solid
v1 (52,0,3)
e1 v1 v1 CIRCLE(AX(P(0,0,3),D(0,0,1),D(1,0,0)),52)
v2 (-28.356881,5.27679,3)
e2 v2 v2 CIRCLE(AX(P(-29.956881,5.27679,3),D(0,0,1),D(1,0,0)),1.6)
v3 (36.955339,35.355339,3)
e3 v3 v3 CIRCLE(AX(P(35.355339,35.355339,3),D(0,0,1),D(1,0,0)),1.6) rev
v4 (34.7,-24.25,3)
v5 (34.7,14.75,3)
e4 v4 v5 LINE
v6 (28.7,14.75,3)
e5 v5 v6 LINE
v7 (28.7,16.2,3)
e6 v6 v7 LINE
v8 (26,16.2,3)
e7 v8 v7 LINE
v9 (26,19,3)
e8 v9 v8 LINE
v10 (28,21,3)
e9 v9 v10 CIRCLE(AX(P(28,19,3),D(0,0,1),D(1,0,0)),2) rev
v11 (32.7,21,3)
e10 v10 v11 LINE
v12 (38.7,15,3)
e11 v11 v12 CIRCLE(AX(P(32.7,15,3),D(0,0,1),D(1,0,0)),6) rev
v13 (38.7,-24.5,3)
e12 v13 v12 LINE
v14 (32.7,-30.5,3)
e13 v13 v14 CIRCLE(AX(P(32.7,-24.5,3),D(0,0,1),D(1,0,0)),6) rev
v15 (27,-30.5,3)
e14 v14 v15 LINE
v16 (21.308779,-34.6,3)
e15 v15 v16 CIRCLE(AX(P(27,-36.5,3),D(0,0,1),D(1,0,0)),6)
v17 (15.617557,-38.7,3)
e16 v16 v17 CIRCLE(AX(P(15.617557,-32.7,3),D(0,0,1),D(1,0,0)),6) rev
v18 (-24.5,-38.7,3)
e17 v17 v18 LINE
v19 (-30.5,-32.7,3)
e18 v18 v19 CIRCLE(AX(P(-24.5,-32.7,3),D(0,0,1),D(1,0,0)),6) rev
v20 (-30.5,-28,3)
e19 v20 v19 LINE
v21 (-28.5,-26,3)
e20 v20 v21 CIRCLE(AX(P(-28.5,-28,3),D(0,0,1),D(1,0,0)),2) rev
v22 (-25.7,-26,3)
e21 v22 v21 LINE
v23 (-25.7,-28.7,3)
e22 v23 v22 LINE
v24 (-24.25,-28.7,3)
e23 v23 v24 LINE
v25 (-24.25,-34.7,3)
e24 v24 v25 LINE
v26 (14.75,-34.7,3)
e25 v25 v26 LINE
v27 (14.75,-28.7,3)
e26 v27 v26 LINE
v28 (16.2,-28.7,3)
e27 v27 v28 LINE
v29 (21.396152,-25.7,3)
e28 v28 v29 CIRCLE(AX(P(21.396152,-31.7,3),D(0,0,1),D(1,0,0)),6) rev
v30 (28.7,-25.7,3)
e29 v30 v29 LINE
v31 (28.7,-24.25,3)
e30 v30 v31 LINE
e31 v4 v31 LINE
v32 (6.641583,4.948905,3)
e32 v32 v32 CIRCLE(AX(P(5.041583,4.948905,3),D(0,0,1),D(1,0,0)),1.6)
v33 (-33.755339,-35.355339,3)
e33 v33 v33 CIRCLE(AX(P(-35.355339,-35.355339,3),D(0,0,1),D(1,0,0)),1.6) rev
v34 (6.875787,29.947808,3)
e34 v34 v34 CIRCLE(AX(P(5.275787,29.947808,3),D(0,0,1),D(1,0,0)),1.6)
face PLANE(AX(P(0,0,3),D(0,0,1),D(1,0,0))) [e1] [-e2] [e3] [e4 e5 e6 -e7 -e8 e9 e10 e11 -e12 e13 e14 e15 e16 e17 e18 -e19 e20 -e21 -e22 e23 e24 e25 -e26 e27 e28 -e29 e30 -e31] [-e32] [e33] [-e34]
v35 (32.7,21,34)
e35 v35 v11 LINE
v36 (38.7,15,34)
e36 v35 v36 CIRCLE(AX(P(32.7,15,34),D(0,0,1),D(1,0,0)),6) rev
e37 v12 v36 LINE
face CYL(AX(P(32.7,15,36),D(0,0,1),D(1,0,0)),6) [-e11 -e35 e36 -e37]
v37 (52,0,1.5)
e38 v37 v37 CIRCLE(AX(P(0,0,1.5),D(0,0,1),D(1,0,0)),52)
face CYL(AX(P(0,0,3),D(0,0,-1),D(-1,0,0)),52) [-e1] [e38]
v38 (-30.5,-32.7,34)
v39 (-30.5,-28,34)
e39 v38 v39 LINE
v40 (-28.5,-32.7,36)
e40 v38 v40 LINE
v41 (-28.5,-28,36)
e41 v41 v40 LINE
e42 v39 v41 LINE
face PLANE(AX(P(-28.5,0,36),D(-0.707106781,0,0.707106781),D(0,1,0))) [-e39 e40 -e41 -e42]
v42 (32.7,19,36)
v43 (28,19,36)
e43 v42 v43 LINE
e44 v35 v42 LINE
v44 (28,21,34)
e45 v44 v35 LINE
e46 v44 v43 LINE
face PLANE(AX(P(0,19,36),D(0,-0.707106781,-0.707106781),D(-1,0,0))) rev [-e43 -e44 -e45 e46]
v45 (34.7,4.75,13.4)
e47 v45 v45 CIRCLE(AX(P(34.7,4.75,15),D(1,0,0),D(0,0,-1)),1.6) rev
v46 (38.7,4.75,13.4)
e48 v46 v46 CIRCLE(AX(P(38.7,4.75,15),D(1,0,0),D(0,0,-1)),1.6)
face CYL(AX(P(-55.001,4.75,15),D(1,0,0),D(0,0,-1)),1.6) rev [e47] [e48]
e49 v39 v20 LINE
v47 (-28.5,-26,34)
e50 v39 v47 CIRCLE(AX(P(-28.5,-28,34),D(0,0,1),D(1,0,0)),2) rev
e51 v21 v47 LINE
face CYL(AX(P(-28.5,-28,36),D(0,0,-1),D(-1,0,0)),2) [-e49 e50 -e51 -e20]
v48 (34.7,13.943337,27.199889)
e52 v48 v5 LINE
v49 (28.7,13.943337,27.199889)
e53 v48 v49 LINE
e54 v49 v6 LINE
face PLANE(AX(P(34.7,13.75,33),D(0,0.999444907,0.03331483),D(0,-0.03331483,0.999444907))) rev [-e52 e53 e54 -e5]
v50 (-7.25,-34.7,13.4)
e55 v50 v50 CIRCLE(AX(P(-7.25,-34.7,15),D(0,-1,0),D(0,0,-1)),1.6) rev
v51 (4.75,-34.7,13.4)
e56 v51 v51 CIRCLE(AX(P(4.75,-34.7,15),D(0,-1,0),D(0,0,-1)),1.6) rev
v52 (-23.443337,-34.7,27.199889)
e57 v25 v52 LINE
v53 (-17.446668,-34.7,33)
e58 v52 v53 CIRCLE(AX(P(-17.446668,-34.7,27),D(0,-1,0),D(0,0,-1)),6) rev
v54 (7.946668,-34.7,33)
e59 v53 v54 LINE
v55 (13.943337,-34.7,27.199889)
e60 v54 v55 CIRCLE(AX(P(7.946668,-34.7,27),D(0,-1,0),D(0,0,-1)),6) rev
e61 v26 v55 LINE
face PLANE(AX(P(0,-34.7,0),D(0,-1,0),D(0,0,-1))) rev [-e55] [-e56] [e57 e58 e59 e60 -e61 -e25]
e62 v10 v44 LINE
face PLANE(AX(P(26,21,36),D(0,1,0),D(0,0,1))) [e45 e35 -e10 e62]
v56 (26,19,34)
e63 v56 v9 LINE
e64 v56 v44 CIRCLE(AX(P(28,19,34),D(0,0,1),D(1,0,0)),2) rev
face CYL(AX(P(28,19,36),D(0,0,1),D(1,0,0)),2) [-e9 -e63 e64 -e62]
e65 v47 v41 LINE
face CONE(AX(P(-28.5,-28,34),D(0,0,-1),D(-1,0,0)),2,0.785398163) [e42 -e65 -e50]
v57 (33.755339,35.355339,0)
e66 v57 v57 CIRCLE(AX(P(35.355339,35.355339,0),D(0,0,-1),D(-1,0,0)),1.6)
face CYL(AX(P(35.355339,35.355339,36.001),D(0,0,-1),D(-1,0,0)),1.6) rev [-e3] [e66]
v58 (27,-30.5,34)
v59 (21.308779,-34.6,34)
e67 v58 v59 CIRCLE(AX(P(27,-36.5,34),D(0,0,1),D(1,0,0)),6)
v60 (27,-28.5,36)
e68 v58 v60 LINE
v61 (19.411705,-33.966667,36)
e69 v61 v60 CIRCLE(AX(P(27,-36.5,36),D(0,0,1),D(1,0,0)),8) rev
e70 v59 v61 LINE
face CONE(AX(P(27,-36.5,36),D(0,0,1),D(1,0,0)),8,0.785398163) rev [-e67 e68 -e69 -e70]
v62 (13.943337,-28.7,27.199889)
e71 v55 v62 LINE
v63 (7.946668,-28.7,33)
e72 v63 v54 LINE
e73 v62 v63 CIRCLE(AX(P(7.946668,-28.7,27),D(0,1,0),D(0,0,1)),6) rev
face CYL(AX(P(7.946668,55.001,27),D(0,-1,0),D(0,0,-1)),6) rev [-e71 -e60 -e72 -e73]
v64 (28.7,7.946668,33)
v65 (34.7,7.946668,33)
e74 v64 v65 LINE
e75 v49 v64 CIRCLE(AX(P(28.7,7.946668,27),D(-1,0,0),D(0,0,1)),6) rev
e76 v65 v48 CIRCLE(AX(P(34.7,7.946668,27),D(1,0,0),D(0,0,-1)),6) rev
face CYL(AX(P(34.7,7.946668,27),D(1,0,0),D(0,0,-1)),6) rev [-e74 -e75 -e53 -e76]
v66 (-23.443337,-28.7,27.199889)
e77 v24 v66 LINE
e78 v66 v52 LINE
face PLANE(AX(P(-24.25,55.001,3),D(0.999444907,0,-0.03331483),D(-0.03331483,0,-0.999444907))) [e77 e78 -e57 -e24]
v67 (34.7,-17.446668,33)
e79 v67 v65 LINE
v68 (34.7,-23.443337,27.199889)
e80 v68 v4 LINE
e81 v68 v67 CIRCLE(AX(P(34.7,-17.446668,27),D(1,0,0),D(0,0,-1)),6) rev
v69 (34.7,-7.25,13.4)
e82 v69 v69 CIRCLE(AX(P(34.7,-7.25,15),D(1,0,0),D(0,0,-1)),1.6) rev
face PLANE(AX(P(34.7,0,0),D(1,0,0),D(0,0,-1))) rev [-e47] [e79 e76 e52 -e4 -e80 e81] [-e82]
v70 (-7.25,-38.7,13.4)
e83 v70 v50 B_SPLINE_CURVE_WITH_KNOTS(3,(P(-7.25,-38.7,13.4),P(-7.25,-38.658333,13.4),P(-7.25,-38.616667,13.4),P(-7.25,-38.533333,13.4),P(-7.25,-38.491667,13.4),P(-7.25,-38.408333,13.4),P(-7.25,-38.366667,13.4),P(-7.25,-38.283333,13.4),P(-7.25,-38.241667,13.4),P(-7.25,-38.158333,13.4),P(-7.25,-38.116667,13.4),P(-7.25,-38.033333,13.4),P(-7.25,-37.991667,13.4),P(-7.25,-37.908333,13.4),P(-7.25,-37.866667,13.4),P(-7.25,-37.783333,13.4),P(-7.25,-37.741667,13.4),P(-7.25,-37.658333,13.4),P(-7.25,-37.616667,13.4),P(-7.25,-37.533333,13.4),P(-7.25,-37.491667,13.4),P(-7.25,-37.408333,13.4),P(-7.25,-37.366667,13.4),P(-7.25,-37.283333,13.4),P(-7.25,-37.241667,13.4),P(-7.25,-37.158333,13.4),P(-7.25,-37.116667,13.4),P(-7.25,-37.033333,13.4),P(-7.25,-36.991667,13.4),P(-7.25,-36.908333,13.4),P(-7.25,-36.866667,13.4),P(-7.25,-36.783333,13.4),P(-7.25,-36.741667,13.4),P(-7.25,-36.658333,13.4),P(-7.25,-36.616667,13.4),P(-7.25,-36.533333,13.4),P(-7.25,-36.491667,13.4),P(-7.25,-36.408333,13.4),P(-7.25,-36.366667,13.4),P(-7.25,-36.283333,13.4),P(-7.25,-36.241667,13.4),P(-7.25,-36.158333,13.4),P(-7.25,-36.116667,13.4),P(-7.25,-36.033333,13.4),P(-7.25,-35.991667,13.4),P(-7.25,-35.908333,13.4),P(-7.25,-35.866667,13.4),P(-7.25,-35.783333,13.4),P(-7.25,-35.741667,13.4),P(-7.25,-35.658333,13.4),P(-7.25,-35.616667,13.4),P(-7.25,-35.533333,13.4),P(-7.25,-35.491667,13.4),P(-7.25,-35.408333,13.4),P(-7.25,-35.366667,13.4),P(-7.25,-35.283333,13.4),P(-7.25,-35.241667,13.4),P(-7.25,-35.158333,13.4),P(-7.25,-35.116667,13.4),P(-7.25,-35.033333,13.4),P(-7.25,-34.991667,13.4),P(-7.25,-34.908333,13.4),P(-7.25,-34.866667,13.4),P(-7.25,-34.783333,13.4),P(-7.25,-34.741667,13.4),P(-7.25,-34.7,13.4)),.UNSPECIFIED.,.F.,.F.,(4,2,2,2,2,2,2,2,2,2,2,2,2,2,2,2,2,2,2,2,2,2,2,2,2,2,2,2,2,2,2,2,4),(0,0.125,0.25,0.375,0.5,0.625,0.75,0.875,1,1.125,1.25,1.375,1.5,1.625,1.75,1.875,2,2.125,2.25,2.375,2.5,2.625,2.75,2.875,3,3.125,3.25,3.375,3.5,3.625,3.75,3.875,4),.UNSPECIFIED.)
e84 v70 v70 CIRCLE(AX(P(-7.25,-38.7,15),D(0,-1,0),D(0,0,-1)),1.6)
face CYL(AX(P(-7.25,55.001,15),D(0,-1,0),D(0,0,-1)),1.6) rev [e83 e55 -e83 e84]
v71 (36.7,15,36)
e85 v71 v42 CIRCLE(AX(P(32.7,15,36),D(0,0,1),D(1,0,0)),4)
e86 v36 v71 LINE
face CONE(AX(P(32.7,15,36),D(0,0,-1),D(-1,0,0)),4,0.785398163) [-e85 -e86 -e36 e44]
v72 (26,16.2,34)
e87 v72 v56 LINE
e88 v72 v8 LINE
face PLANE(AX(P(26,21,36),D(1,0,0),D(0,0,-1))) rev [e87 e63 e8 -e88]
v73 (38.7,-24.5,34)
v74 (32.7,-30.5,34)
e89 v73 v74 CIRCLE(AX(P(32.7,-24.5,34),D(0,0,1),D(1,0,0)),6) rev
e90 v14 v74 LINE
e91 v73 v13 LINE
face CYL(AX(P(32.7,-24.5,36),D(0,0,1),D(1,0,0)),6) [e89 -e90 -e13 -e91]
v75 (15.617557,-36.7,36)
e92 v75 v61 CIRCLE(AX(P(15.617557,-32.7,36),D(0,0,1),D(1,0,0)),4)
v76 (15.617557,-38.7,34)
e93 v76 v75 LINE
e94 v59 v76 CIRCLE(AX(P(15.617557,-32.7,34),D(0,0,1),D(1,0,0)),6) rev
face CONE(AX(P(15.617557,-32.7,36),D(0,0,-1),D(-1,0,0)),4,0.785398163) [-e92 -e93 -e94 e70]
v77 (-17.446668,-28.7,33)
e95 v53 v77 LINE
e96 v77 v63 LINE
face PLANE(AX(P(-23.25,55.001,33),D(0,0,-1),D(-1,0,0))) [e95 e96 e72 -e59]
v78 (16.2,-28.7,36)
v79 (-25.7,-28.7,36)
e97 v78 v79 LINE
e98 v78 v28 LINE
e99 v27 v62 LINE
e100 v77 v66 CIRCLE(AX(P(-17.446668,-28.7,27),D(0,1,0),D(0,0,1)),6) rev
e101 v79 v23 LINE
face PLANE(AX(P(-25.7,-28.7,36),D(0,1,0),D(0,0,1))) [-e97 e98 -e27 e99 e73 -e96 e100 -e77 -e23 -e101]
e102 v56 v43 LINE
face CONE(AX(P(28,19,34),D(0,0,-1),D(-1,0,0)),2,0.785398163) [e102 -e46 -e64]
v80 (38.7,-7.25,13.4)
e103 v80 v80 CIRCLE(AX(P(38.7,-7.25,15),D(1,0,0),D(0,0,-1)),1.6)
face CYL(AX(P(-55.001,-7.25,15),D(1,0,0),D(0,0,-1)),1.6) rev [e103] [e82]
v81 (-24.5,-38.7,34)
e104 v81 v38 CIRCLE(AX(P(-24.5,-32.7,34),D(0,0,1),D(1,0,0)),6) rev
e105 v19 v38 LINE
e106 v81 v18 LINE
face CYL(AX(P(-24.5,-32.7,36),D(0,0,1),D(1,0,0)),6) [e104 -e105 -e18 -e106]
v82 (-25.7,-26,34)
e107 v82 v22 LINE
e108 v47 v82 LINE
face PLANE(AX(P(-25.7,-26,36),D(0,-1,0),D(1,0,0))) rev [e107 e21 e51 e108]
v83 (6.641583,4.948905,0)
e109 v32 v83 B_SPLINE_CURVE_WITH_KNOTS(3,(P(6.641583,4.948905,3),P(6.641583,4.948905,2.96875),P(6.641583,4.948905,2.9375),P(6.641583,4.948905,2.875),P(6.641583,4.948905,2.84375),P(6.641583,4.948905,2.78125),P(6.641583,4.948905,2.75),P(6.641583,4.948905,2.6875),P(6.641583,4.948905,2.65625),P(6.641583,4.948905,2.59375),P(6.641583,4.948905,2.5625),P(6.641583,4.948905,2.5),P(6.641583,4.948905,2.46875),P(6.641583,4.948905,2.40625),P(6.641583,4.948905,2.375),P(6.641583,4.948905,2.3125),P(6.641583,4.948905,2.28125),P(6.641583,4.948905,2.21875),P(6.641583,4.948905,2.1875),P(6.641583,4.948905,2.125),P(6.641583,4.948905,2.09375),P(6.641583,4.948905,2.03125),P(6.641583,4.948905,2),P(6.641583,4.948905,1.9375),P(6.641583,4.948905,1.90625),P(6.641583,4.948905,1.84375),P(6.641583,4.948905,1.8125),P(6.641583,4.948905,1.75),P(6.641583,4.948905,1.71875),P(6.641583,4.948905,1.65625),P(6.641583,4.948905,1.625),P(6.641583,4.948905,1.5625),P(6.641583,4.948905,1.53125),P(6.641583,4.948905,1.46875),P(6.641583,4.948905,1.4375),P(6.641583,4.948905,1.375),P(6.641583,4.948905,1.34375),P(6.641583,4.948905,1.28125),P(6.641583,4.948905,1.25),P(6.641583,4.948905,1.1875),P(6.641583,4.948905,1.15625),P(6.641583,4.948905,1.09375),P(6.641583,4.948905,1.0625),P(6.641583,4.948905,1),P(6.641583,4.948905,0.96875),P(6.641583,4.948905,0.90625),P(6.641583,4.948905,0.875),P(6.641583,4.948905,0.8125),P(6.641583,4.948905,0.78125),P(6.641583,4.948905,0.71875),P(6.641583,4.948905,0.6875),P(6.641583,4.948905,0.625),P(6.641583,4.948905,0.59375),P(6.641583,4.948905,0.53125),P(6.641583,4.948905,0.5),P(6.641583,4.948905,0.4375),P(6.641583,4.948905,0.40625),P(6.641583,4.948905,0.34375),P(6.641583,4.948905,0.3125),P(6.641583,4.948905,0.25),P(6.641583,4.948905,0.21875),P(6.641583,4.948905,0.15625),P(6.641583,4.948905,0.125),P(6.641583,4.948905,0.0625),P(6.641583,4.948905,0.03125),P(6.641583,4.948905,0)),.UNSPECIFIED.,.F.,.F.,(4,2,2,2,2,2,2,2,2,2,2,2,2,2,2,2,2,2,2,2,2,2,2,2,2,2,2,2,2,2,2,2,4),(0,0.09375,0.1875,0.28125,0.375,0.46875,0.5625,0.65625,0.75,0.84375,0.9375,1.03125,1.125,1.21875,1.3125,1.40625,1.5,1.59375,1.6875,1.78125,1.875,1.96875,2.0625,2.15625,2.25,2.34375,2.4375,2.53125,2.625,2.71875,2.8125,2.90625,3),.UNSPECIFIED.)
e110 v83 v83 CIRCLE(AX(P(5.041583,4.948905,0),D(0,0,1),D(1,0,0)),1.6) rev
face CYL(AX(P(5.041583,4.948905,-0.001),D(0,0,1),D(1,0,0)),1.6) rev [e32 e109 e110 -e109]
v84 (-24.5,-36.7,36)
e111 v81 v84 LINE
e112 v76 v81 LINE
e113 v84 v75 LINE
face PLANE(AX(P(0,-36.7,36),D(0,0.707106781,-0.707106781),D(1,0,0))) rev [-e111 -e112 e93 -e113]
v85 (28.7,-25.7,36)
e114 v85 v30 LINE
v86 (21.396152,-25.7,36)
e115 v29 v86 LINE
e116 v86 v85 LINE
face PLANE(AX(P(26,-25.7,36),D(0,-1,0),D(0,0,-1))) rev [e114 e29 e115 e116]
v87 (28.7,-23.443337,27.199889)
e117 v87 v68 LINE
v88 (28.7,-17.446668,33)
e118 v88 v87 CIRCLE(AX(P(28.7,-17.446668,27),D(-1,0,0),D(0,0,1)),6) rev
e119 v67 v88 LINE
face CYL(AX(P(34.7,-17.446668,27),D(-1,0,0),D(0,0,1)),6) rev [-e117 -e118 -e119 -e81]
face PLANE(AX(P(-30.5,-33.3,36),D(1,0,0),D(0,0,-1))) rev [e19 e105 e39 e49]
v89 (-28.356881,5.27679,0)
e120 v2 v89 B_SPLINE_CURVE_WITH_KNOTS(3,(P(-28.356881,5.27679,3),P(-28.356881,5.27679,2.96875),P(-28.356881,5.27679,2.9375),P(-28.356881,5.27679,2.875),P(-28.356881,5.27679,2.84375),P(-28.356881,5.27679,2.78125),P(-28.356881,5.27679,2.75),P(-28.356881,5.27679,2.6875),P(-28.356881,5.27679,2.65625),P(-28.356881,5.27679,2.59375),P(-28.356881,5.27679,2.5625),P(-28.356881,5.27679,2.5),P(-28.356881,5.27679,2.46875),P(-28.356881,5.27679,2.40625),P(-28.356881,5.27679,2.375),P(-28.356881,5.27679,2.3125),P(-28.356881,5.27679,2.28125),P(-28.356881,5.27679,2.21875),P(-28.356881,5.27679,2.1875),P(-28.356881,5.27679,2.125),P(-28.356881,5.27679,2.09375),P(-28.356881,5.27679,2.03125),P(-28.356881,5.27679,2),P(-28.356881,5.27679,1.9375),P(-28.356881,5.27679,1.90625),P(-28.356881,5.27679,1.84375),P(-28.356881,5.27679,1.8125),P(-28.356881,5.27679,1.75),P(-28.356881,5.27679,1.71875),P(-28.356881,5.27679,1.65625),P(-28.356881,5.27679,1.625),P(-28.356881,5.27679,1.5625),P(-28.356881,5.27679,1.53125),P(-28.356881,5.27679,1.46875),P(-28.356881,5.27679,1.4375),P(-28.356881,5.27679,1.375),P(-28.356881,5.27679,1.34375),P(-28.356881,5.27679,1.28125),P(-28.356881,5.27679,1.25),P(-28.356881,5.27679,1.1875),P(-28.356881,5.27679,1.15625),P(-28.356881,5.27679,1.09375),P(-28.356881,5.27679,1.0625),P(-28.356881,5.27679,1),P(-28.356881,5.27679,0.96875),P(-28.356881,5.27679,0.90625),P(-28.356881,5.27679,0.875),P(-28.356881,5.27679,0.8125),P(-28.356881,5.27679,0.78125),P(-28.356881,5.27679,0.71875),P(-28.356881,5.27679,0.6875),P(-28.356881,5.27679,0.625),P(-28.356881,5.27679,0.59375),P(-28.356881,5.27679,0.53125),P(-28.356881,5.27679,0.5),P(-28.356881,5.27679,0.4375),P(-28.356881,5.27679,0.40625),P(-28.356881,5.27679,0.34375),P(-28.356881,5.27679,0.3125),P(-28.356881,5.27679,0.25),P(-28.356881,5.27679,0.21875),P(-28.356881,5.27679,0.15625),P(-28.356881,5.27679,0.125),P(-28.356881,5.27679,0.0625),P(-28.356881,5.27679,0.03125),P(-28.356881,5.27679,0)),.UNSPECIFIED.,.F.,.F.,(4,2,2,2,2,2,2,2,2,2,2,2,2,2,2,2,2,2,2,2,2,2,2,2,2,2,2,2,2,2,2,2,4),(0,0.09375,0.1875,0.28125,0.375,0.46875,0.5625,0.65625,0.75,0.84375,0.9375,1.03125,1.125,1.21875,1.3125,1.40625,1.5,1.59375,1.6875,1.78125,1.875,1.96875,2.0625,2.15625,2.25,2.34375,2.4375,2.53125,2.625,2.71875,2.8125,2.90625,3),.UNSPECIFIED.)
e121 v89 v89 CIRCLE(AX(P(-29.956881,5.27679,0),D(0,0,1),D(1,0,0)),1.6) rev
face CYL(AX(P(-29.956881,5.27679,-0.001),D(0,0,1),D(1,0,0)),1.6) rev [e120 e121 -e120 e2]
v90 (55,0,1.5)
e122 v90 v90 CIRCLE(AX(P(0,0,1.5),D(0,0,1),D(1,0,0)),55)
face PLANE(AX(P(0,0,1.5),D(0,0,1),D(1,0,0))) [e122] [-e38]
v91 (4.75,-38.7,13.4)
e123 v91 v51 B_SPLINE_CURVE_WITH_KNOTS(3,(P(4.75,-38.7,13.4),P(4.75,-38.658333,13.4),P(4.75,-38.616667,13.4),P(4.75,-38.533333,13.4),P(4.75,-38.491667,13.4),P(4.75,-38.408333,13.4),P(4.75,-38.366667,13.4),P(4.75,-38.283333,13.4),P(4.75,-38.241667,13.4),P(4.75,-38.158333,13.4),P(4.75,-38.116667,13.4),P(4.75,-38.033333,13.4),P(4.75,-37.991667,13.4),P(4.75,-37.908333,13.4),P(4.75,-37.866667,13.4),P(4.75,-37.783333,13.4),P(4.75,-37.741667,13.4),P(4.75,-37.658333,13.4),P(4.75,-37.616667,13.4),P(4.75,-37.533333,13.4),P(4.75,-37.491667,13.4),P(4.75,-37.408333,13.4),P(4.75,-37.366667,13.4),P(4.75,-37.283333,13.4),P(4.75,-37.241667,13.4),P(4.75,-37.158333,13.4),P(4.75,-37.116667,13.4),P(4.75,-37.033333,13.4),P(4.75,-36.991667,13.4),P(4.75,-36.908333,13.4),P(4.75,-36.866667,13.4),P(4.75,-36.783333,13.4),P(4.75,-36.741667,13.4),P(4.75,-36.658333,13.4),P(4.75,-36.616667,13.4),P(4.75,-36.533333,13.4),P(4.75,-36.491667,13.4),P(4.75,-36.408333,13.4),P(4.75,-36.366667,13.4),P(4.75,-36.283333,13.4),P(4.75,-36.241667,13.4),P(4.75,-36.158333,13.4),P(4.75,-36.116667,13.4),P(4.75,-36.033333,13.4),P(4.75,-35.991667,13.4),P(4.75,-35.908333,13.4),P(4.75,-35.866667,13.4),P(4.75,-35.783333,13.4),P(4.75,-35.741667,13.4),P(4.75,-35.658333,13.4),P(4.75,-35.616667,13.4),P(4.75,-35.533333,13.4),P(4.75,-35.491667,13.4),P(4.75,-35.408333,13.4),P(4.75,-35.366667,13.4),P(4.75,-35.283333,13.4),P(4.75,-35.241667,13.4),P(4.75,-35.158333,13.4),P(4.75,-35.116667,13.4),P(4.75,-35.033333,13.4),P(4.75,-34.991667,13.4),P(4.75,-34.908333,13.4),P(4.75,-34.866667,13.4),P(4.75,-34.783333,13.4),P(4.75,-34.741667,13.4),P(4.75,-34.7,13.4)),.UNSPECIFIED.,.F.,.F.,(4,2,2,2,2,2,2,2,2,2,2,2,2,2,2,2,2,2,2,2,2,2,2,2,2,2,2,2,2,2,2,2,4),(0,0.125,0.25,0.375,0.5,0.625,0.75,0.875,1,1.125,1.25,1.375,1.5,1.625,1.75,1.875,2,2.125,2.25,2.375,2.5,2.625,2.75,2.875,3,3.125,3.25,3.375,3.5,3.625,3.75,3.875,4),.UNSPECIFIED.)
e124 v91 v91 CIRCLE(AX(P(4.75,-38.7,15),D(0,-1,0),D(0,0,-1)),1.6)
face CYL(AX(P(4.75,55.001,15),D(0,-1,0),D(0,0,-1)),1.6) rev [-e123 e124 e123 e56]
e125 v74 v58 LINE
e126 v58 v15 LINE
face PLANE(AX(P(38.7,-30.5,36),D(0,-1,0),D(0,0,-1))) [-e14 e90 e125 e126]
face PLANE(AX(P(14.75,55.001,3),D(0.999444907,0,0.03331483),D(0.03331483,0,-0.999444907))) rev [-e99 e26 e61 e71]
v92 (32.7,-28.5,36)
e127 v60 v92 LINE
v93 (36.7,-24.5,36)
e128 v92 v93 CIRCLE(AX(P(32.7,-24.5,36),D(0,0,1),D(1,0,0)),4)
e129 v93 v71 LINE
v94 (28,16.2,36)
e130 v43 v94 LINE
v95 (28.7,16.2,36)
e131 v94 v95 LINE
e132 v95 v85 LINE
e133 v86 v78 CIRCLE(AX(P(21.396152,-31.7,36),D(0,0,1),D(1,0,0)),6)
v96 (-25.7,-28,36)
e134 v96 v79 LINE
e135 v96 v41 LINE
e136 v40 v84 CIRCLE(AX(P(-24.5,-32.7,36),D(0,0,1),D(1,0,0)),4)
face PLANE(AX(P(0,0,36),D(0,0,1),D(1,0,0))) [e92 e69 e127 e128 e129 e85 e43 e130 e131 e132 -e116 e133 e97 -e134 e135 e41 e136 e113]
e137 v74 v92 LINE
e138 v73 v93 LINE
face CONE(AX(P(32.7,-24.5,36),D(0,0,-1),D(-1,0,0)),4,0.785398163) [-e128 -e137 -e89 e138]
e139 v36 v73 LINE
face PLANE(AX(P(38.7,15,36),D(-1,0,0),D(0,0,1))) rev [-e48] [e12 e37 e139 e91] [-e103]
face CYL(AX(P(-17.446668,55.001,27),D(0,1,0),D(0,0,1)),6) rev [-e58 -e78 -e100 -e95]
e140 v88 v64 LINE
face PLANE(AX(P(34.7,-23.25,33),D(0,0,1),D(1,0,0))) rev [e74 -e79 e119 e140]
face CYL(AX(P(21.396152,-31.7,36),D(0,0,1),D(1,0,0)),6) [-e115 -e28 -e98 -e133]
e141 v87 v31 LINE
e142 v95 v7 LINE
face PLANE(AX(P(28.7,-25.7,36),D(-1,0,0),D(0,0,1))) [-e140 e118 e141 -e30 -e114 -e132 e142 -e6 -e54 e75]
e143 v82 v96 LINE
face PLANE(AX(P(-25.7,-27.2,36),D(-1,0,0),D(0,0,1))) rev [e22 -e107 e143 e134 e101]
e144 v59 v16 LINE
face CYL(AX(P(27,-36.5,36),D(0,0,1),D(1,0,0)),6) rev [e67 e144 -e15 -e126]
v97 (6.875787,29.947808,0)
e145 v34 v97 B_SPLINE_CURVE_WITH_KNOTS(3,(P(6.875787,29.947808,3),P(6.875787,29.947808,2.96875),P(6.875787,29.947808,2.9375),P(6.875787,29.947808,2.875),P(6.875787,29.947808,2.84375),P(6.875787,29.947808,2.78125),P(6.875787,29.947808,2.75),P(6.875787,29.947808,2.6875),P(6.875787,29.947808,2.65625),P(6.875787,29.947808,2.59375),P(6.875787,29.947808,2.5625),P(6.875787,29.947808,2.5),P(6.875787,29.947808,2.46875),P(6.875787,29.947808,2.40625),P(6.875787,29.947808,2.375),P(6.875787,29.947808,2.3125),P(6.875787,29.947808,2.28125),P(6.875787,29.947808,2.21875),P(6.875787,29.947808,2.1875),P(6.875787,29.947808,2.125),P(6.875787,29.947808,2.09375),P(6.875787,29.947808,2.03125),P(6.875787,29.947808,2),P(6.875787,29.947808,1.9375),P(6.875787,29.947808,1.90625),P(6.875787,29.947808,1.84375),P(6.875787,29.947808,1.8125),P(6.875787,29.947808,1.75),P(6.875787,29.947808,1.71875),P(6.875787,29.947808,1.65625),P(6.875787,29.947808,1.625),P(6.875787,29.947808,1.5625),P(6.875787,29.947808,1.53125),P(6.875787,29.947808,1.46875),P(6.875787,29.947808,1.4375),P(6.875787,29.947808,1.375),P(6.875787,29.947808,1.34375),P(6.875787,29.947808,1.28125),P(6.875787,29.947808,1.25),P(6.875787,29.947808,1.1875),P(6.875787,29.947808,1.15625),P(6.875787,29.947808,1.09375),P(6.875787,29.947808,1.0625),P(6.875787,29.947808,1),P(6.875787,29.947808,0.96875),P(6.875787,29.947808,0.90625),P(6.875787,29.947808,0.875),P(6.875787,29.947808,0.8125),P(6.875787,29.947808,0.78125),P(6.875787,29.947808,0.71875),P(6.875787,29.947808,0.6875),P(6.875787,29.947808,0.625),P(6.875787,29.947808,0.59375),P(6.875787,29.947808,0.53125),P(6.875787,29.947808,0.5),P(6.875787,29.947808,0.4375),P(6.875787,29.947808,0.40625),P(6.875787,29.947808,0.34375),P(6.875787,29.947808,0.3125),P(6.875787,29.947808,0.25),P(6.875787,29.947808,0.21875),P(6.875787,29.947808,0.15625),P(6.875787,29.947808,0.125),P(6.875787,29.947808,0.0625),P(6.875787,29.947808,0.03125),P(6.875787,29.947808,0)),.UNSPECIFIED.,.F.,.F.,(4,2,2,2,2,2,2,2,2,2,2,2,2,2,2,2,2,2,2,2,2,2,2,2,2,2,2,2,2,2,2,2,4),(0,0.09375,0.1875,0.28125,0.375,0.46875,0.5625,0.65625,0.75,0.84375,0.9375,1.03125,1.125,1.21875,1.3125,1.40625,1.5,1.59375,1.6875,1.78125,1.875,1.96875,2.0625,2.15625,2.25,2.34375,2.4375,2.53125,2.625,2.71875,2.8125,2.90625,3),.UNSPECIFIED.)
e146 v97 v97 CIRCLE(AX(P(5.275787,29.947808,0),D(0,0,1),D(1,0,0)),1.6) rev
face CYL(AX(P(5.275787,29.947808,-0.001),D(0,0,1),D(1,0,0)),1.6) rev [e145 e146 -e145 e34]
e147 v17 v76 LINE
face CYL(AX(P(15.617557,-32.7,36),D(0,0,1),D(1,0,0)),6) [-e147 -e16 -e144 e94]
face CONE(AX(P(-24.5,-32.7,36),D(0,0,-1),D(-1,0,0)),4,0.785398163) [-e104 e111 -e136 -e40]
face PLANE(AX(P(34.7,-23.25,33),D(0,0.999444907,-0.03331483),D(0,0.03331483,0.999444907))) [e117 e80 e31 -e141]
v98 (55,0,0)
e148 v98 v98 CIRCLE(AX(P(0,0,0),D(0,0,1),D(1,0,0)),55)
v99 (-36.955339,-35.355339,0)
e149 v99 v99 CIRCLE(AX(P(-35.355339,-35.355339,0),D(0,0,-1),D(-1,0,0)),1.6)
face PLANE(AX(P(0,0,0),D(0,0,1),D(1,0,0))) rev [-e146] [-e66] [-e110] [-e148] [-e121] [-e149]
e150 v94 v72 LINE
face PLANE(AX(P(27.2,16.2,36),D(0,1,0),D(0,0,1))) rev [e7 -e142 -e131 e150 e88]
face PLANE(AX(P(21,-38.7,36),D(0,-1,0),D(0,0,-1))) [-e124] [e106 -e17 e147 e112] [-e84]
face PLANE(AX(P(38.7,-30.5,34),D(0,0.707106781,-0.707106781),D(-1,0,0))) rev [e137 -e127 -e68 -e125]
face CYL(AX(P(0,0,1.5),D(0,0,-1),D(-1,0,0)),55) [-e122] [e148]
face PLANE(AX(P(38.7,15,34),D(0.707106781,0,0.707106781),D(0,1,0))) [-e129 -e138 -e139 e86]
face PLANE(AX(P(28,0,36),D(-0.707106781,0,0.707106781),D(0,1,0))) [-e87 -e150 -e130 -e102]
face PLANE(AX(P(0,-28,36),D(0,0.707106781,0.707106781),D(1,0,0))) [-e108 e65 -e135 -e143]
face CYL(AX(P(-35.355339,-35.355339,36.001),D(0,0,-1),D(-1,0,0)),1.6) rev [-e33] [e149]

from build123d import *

# Parameters (mm, degrees)
SKIZZE1_R                        = 52
AUFSATZ_LINEAR_AUSTRAGEN1_DEPTH  = 3
SKIZZE1_3_R                      = 55
SKIZZE1_3_R_2                    = 52
AUFSATZ_LINEAR_AUSTRAGEN2_DEPTH  = 1.5
SCHNITT_LINEAR_AUSTRAGEN1_REACH  = 79.84
SKIZZE3_R                        = 1.6
AUFSATZ_LINEAR_AUSTRAGEN3_DEPTH  = 33
SCHNITT_LINEAR_AUSTRAGEN4_REACH  = 120.458
SCHNITT_LINEAR_START             = -4
VERRUNDUNG1_R                    = 6
SCHNITT_LINEAR_AUSTRAGEN9_DEPTH  = 6
VERRUNDUNG2_R                    = 6
VERRUNDUNG4_R                    = 6
VERRUNDUNG5_R                    = 6
VERRUNDUNG6_R                    = 2
SCHNITT_LINEAR_AUSTRAGEN10_REACH = 116.458
SKIZZE8_R                        = 1.6
SCHNITT_LINEAR_AUSTRAGEN11_REACH = 116.458
SKIZZE9_R                        = 1.6
VERRUNDUNG7_R                    = 6
SCHNITT_LINEAR_AUSTRAGEN13_REACH = 87.709
SKIZZE10_R                       = 1.6
FASE1_SIZE                       = 2


# Some blends are built 0.0001 mm under size
with BuildPart() as part:
    # Skizze1 → Aufsatz-Linear austragen1 (new body)
    with BuildSketch(Plane.XY):
        Circle(SKIZZE1_R)
    extrude(amount=AUFSATZ_LINEAR_AUSTRAGEN1_DEPTH)

    # Skizze1<3> → Aufsatz-Linear austragen2 (add)
    with BuildSketch(Plane.XY):
        Circle(SKIZZE1_3_R)
        Circle(SKIZZE1_3_R_2, mode=Mode.SUBTRACT)
    extrude(amount=AUFSATZ_LINEAR_AUSTRAGEN2_DEPTH)

    # Skizze3 → Schnitt-Linear austragen1 (cut, up to next)
    with BuildSketch(Plane.XY.offset(3), mode=Mode.PRIVATE) as schnitt_linear_austragen1_sk1:
        with Locations((5.041583425, 4.948905083)):
            Circle(SKIZZE3_R)
    schnitt_linear_austragen1_tool1 = extrude(schnitt_linear_austragen1_sk1.sketch, amount=-SCHNITT_LINEAR_AUSTRAGEN1_REACH, mode=Mode.PRIVATE) & part.part
    # Skizze3 → Schnitt-Linear austragen1 (cut, up to next)
    with BuildSketch(Plane.XY.offset(3), mode=Mode.PRIVATE) as schnitt_linear_austragen1_sk2:
        with Locations((5.275786867, 29.947808034)):
            Circle(SKIZZE3_R)
    schnitt_linear_austragen1_tool2 = extrude(schnitt_linear_austragen1_sk2.sketch, amount=-SCHNITT_LINEAR_AUSTRAGEN1_REACH, mode=Mode.PRIVATE) & part.part
    # Skizze3 → Schnitt-Linear austragen1 (cut, up to next)
    with BuildSketch(Plane.XY.offset(3), mode=Mode.PRIVATE) as schnitt_linear_austragen1_sk3:
        with Locations((-29.956880706, 5.276789902)):
            Circle(SKIZZE3_R)
    schnitt_linear_austragen1_tool3 = extrude(schnitt_linear_austragen1_sk3.sketch, amount=-SCHNITT_LINEAR_AUSTRAGEN1_REACH, mode=Mode.PRIVATE) & part.part
    add(schnitt_linear_austragen1_tool1.solids().sort_by_distance((5.041583, 4.948905, 3))[0], mode=Mode.SUBTRACT)
    add(schnitt_linear_austragen1_tool2.solids().sort_by_distance((5.275787, 29.947808, 3))[0], mode=Mode.SUBTRACT)
    add(schnitt_linear_austragen1_tool3.solids().sort_by_distance((-29.956881, 5.27679, 3))[0], mode=Mode.SUBTRACT)

    # Skizze2 → Aufsatz-Linear austragen3 (add)
    with BuildSketch(Plane.XY.offset(3)):
        Polygon((26, 21), (26, 16.2), (27.2, 16.2), (28.7, 16.2), (28.7, 15), (28.7, -24.5), (28.7, -25.7), (27.2, -25.7), (26, -25.7), (16.2, -25.7), (16.2, -26), (16.2, -27.2), (16.2, -28.7), (15, -28.7), (-24.5, -28.7), (-25.7, -28.7), (-25.7, -27.2), (-25.7, -26), (-30.5, -26), (-30.5, -33.3), (-30.5, -38.7), (-24.5, -38.7), (15, -38.7), (21, -38.7), (21, -33.3), (21, -30.5), (26, -30.5), (33.3, -30.5), (38.7, -30.5), (38.7, -24.5), (38.7, 15), (38.7, 21), (33.3, 21), align=None)
    extrude(amount=AUFSATZ_LINEAR_AUSTRAGEN3_DEPTH)

    # Skizze6 → Schnitt-Linear austragen4 (cut, up to next)
    with BuildSketch(Plane.XZ.offset(38.7).offset(SCHNITT_LINEAR_START), mode=Mode.PRIVATE) as schnitt_linear_austragen4_sk1:
        Polygon((-24.25, 3), (-23.25, 33), (13.75, 33), (14.75, 3), align=None)
    schnitt_linear_austragen4_tool1 = extrude(schnitt_linear_austragen4_sk1.sketch, amount=-SCHNITT_LINEAR_AUSTRAGEN4_REACH, mode=Mode.PRIVATE) & part.part
    add(schnitt_linear_austragen4_tool1.solids().sort_by_distance((-4.75, -34.7, 17.868421))[0], mode=Mode.SUBTRACT)

    # Verrundung1
    verrundung1_edges = [part.edges().sort_by_distance(p)[0] for p in [
        (-23.25, -31.7, 33),
        (13.75, -31.7, 33),
    ]]
    fillet(verrundung1_edges, radius=VERRUNDUNG1_R)

    # Skizze7 → Schnitt-Linear austragen9 (cut)
    with BuildSketch(Plane.ZY.offset(-28.7)):
        Polygon((33, -23.25), (33, 13.75), (3, 14.75), (3, -24.25), align=None)
    extrude(amount=-SCHNITT_LINEAR_AUSTRAGEN9_DEPTH, mode=Mode.SUBTRACT)

    # Verrundung2
    verrundung2_edges = [part.edges().sort_by_distance(p)[0] for p in [
        (31.7, -23.25, 33),
        (31.7, 13.75, 33),
    ]]
    fillet(verrundung2_edges, radius=VERRUNDUNG2_R)

    # Verrundung4
    verrundung4_edges = [part.edges().sort_by_distance(p)[0] for p in [
        (21, -30.5, 19.5),
    ]]
    fillet(verrundung4_edges, radius=VERRUNDUNG4_R)

    # Verrundung5
    # the kernel refuses this fillet: 6 mm, written as the material it takes off along each edge
    with BuildSketch(Plane(origin=(16.2, -25.7, 3), x_dir=(1, 0, 0), z_dir=(0, 0, 1))) as verrundung5_piece_1:
        with BuildLine():
            CenterArc((5.196152423, -6), VERRUNDUNG5_R, 90, 60)
            Line((0, -3), (0, 0))
            Line((0, 0), (5.196152423, 0))
        make_face()
    extrude(amount=45.990381057, mode=Mode.SUBTRACT)

    # Verrundung6
    verrundung6_edges = [part.edges().sort_by_distance(p)[0] for p in [
        (26, 21, 19.5),
        (-30.5, -26, 19.5),
    ]]
    fillet(verrundung6_edges, radius=VERRUNDUNG6_R)

    # Skizze8 → Schnitt-Linear austragen10 (cut, up to next)
    with BuildSketch(Plane.XZ.offset(38.7), mode=Mode.PRIVATE) as schnitt_linear_austragen10_sk1:
        with Locations(Location((4.75, 15, 0), (0, 0, 270))):
            Circle(SKIZZE8_R)
    schnitt_linear_austragen10_tool1 = extrude(schnitt_linear_austragen10_sk1.sketch, amount=-SCHNITT_LINEAR_AUSTRAGEN10_REACH, mode=Mode.PRIVATE) & part.part
    # Skizze8 → Schnitt-Linear austragen10 (cut, up to next)
    with BuildSketch(Plane.XZ.offset(38.7), mode=Mode.PRIVATE) as schnitt_linear_austragen10_sk2:
        with Locations(Location((-7.25, 15, 0), (0, 0, 270))):
            Circle(SKIZZE8_R)
    schnitt_linear_austragen10_tool2 = extrude(schnitt_linear_austragen10_sk2.sketch, amount=-SCHNITT_LINEAR_AUSTRAGEN10_REACH, mode=Mode.PRIVATE) & part.part
    add(schnitt_linear_austragen10_tool1.solids().sort_by_distance((4.75, -38.7, 15))[0], mode=Mode.SUBTRACT)
    add(schnitt_linear_austragen10_tool2.solids().sort_by_distance((-7.25, -38.7, 15))[0], mode=Mode.SUBTRACT)

    # Skizze9 → Schnitt-Linear austragen11 (cut, up to next)
    with BuildSketch(Plane(origin=(38.7, 0, 0), x_dir=(0, 0, -1), z_dir=(1, 0, 0)), mode=Mode.PRIVATE) as schnitt_linear_austragen11_sk1:
        with Locations((-15, -7.25)):
            Circle(SKIZZE9_R)
    schnitt_linear_austragen11_tool1 = extrude(schnitt_linear_austragen11_sk1.sketch, amount=-SCHNITT_LINEAR_AUSTRAGEN11_REACH, mode=Mode.PRIVATE) & part.part
    # Skizze9 → Schnitt-Linear austragen11 (cut, up to next)
    with BuildSketch(Plane(origin=(38.7, 0, 0), x_dir=(0, 0, -1), z_dir=(1, 0, 0)), mode=Mode.PRIVATE) as schnitt_linear_austragen11_sk2:
        with Locations((-15, 4.75)):
            Circle(SKIZZE9_R)
    schnitt_linear_austragen11_tool2 = extrude(schnitt_linear_austragen11_sk2.sketch, amount=-SCHNITT_LINEAR_AUSTRAGEN11_REACH, mode=Mode.PRIVATE) & part.part
    add(schnitt_linear_austragen11_tool1.solids().sort_by_distance((38.7, -7.25, 15))[0], mode=Mode.SUBTRACT)
    add(schnitt_linear_austragen11_tool2.solids().sort_by_distance((38.7, 4.75, 15))[0], mode=Mode.SUBTRACT)

    # Verrundung7
    verrundung7_edges = [part.edges().sort_by_distance(p)[0] for p in [
        (38.7, 21, 19.5),
        (-30.5, -38.7, 19.5),
        (21, -38.7, 19.5),
        (38.7, -30.5, 19.5),
    ]]
    fillet(verrundung7_edges, radius=VERRUNDUNG7_R)

    # Skizze10 → Schnitt-Linear austragen13 (cut, up to next)
    with BuildSketch(Plane(origin=(0, 0, 0), x_dir=(-1, 0, 0), z_dir=(0, 0, -1)), mode=Mode.PRIVATE) as schnitt_linear_austragen13_sk1:
        with Locations((35.355339059, -35.355339059)):
            Circle(SKIZZE10_R)
    schnitt_linear_austragen13_tool1 = extrude(schnitt_linear_austragen13_sk1.sketch, amount=-SCHNITT_LINEAR_AUSTRAGEN13_REACH, mode=Mode.PRIVATE) & part.part
    # Skizze10 → Schnitt-Linear austragen13 (cut, up to next)
    with BuildSketch(Plane(origin=(0, 0, 0), x_dir=(-1, 0, 0), z_dir=(0, 0, -1)), mode=Mode.PRIVATE) as schnitt_linear_austragen13_sk2:
        with Locations((-35.355339059, 35.355339059)):
            Circle(SKIZZE10_R)
    schnitt_linear_austragen13_tool2 = extrude(schnitt_linear_austragen13_sk2.sketch, amount=-SCHNITT_LINEAR_AUSTRAGEN13_REACH, mode=Mode.PRIVATE) & part.part
    add(schnitt_linear_austragen13_tool1.solids().sort_by_distance((-35.355339, -35.355339, 0))[0], mode=Mode.SUBTRACT)
    add(schnitt_linear_austragen13_tool2.solids().sort_by_distance((35.355339, 35.355339, 0))[0], mode=Mode.SUBTRACT)

    # Fase1
    fase1_edges = [part.edges().sort_by_distance(p)[0] for p in [
        (-30.5, -30.35, 36),
        (26, 17.6, 36),
        (26.585786438, 20.414213562, 36),
        (-29.914213562, -26.585786438, 36),
        (30.35, 21, 36),
        (38.7, -4.75, 36),
        (-4.44122131, -38.7, 36),
        (23.492864417, -31.631735422, 36),
        (29.85, -30.5, 36),
        (36.942640687, -28.742640687, 36),
        (19.124692969, -37.568264574, 36),
        (-28.742640687, -36.942640687, 36),
        (36.942640687, 19.242640687, 36),
        (-27.1, -26, 36),
    ]]
    chamfer(fase1_edges, length=FASE1_SIZE - 0.0001)  # a hair under: the kernel refuses the full size


solid = part.part
